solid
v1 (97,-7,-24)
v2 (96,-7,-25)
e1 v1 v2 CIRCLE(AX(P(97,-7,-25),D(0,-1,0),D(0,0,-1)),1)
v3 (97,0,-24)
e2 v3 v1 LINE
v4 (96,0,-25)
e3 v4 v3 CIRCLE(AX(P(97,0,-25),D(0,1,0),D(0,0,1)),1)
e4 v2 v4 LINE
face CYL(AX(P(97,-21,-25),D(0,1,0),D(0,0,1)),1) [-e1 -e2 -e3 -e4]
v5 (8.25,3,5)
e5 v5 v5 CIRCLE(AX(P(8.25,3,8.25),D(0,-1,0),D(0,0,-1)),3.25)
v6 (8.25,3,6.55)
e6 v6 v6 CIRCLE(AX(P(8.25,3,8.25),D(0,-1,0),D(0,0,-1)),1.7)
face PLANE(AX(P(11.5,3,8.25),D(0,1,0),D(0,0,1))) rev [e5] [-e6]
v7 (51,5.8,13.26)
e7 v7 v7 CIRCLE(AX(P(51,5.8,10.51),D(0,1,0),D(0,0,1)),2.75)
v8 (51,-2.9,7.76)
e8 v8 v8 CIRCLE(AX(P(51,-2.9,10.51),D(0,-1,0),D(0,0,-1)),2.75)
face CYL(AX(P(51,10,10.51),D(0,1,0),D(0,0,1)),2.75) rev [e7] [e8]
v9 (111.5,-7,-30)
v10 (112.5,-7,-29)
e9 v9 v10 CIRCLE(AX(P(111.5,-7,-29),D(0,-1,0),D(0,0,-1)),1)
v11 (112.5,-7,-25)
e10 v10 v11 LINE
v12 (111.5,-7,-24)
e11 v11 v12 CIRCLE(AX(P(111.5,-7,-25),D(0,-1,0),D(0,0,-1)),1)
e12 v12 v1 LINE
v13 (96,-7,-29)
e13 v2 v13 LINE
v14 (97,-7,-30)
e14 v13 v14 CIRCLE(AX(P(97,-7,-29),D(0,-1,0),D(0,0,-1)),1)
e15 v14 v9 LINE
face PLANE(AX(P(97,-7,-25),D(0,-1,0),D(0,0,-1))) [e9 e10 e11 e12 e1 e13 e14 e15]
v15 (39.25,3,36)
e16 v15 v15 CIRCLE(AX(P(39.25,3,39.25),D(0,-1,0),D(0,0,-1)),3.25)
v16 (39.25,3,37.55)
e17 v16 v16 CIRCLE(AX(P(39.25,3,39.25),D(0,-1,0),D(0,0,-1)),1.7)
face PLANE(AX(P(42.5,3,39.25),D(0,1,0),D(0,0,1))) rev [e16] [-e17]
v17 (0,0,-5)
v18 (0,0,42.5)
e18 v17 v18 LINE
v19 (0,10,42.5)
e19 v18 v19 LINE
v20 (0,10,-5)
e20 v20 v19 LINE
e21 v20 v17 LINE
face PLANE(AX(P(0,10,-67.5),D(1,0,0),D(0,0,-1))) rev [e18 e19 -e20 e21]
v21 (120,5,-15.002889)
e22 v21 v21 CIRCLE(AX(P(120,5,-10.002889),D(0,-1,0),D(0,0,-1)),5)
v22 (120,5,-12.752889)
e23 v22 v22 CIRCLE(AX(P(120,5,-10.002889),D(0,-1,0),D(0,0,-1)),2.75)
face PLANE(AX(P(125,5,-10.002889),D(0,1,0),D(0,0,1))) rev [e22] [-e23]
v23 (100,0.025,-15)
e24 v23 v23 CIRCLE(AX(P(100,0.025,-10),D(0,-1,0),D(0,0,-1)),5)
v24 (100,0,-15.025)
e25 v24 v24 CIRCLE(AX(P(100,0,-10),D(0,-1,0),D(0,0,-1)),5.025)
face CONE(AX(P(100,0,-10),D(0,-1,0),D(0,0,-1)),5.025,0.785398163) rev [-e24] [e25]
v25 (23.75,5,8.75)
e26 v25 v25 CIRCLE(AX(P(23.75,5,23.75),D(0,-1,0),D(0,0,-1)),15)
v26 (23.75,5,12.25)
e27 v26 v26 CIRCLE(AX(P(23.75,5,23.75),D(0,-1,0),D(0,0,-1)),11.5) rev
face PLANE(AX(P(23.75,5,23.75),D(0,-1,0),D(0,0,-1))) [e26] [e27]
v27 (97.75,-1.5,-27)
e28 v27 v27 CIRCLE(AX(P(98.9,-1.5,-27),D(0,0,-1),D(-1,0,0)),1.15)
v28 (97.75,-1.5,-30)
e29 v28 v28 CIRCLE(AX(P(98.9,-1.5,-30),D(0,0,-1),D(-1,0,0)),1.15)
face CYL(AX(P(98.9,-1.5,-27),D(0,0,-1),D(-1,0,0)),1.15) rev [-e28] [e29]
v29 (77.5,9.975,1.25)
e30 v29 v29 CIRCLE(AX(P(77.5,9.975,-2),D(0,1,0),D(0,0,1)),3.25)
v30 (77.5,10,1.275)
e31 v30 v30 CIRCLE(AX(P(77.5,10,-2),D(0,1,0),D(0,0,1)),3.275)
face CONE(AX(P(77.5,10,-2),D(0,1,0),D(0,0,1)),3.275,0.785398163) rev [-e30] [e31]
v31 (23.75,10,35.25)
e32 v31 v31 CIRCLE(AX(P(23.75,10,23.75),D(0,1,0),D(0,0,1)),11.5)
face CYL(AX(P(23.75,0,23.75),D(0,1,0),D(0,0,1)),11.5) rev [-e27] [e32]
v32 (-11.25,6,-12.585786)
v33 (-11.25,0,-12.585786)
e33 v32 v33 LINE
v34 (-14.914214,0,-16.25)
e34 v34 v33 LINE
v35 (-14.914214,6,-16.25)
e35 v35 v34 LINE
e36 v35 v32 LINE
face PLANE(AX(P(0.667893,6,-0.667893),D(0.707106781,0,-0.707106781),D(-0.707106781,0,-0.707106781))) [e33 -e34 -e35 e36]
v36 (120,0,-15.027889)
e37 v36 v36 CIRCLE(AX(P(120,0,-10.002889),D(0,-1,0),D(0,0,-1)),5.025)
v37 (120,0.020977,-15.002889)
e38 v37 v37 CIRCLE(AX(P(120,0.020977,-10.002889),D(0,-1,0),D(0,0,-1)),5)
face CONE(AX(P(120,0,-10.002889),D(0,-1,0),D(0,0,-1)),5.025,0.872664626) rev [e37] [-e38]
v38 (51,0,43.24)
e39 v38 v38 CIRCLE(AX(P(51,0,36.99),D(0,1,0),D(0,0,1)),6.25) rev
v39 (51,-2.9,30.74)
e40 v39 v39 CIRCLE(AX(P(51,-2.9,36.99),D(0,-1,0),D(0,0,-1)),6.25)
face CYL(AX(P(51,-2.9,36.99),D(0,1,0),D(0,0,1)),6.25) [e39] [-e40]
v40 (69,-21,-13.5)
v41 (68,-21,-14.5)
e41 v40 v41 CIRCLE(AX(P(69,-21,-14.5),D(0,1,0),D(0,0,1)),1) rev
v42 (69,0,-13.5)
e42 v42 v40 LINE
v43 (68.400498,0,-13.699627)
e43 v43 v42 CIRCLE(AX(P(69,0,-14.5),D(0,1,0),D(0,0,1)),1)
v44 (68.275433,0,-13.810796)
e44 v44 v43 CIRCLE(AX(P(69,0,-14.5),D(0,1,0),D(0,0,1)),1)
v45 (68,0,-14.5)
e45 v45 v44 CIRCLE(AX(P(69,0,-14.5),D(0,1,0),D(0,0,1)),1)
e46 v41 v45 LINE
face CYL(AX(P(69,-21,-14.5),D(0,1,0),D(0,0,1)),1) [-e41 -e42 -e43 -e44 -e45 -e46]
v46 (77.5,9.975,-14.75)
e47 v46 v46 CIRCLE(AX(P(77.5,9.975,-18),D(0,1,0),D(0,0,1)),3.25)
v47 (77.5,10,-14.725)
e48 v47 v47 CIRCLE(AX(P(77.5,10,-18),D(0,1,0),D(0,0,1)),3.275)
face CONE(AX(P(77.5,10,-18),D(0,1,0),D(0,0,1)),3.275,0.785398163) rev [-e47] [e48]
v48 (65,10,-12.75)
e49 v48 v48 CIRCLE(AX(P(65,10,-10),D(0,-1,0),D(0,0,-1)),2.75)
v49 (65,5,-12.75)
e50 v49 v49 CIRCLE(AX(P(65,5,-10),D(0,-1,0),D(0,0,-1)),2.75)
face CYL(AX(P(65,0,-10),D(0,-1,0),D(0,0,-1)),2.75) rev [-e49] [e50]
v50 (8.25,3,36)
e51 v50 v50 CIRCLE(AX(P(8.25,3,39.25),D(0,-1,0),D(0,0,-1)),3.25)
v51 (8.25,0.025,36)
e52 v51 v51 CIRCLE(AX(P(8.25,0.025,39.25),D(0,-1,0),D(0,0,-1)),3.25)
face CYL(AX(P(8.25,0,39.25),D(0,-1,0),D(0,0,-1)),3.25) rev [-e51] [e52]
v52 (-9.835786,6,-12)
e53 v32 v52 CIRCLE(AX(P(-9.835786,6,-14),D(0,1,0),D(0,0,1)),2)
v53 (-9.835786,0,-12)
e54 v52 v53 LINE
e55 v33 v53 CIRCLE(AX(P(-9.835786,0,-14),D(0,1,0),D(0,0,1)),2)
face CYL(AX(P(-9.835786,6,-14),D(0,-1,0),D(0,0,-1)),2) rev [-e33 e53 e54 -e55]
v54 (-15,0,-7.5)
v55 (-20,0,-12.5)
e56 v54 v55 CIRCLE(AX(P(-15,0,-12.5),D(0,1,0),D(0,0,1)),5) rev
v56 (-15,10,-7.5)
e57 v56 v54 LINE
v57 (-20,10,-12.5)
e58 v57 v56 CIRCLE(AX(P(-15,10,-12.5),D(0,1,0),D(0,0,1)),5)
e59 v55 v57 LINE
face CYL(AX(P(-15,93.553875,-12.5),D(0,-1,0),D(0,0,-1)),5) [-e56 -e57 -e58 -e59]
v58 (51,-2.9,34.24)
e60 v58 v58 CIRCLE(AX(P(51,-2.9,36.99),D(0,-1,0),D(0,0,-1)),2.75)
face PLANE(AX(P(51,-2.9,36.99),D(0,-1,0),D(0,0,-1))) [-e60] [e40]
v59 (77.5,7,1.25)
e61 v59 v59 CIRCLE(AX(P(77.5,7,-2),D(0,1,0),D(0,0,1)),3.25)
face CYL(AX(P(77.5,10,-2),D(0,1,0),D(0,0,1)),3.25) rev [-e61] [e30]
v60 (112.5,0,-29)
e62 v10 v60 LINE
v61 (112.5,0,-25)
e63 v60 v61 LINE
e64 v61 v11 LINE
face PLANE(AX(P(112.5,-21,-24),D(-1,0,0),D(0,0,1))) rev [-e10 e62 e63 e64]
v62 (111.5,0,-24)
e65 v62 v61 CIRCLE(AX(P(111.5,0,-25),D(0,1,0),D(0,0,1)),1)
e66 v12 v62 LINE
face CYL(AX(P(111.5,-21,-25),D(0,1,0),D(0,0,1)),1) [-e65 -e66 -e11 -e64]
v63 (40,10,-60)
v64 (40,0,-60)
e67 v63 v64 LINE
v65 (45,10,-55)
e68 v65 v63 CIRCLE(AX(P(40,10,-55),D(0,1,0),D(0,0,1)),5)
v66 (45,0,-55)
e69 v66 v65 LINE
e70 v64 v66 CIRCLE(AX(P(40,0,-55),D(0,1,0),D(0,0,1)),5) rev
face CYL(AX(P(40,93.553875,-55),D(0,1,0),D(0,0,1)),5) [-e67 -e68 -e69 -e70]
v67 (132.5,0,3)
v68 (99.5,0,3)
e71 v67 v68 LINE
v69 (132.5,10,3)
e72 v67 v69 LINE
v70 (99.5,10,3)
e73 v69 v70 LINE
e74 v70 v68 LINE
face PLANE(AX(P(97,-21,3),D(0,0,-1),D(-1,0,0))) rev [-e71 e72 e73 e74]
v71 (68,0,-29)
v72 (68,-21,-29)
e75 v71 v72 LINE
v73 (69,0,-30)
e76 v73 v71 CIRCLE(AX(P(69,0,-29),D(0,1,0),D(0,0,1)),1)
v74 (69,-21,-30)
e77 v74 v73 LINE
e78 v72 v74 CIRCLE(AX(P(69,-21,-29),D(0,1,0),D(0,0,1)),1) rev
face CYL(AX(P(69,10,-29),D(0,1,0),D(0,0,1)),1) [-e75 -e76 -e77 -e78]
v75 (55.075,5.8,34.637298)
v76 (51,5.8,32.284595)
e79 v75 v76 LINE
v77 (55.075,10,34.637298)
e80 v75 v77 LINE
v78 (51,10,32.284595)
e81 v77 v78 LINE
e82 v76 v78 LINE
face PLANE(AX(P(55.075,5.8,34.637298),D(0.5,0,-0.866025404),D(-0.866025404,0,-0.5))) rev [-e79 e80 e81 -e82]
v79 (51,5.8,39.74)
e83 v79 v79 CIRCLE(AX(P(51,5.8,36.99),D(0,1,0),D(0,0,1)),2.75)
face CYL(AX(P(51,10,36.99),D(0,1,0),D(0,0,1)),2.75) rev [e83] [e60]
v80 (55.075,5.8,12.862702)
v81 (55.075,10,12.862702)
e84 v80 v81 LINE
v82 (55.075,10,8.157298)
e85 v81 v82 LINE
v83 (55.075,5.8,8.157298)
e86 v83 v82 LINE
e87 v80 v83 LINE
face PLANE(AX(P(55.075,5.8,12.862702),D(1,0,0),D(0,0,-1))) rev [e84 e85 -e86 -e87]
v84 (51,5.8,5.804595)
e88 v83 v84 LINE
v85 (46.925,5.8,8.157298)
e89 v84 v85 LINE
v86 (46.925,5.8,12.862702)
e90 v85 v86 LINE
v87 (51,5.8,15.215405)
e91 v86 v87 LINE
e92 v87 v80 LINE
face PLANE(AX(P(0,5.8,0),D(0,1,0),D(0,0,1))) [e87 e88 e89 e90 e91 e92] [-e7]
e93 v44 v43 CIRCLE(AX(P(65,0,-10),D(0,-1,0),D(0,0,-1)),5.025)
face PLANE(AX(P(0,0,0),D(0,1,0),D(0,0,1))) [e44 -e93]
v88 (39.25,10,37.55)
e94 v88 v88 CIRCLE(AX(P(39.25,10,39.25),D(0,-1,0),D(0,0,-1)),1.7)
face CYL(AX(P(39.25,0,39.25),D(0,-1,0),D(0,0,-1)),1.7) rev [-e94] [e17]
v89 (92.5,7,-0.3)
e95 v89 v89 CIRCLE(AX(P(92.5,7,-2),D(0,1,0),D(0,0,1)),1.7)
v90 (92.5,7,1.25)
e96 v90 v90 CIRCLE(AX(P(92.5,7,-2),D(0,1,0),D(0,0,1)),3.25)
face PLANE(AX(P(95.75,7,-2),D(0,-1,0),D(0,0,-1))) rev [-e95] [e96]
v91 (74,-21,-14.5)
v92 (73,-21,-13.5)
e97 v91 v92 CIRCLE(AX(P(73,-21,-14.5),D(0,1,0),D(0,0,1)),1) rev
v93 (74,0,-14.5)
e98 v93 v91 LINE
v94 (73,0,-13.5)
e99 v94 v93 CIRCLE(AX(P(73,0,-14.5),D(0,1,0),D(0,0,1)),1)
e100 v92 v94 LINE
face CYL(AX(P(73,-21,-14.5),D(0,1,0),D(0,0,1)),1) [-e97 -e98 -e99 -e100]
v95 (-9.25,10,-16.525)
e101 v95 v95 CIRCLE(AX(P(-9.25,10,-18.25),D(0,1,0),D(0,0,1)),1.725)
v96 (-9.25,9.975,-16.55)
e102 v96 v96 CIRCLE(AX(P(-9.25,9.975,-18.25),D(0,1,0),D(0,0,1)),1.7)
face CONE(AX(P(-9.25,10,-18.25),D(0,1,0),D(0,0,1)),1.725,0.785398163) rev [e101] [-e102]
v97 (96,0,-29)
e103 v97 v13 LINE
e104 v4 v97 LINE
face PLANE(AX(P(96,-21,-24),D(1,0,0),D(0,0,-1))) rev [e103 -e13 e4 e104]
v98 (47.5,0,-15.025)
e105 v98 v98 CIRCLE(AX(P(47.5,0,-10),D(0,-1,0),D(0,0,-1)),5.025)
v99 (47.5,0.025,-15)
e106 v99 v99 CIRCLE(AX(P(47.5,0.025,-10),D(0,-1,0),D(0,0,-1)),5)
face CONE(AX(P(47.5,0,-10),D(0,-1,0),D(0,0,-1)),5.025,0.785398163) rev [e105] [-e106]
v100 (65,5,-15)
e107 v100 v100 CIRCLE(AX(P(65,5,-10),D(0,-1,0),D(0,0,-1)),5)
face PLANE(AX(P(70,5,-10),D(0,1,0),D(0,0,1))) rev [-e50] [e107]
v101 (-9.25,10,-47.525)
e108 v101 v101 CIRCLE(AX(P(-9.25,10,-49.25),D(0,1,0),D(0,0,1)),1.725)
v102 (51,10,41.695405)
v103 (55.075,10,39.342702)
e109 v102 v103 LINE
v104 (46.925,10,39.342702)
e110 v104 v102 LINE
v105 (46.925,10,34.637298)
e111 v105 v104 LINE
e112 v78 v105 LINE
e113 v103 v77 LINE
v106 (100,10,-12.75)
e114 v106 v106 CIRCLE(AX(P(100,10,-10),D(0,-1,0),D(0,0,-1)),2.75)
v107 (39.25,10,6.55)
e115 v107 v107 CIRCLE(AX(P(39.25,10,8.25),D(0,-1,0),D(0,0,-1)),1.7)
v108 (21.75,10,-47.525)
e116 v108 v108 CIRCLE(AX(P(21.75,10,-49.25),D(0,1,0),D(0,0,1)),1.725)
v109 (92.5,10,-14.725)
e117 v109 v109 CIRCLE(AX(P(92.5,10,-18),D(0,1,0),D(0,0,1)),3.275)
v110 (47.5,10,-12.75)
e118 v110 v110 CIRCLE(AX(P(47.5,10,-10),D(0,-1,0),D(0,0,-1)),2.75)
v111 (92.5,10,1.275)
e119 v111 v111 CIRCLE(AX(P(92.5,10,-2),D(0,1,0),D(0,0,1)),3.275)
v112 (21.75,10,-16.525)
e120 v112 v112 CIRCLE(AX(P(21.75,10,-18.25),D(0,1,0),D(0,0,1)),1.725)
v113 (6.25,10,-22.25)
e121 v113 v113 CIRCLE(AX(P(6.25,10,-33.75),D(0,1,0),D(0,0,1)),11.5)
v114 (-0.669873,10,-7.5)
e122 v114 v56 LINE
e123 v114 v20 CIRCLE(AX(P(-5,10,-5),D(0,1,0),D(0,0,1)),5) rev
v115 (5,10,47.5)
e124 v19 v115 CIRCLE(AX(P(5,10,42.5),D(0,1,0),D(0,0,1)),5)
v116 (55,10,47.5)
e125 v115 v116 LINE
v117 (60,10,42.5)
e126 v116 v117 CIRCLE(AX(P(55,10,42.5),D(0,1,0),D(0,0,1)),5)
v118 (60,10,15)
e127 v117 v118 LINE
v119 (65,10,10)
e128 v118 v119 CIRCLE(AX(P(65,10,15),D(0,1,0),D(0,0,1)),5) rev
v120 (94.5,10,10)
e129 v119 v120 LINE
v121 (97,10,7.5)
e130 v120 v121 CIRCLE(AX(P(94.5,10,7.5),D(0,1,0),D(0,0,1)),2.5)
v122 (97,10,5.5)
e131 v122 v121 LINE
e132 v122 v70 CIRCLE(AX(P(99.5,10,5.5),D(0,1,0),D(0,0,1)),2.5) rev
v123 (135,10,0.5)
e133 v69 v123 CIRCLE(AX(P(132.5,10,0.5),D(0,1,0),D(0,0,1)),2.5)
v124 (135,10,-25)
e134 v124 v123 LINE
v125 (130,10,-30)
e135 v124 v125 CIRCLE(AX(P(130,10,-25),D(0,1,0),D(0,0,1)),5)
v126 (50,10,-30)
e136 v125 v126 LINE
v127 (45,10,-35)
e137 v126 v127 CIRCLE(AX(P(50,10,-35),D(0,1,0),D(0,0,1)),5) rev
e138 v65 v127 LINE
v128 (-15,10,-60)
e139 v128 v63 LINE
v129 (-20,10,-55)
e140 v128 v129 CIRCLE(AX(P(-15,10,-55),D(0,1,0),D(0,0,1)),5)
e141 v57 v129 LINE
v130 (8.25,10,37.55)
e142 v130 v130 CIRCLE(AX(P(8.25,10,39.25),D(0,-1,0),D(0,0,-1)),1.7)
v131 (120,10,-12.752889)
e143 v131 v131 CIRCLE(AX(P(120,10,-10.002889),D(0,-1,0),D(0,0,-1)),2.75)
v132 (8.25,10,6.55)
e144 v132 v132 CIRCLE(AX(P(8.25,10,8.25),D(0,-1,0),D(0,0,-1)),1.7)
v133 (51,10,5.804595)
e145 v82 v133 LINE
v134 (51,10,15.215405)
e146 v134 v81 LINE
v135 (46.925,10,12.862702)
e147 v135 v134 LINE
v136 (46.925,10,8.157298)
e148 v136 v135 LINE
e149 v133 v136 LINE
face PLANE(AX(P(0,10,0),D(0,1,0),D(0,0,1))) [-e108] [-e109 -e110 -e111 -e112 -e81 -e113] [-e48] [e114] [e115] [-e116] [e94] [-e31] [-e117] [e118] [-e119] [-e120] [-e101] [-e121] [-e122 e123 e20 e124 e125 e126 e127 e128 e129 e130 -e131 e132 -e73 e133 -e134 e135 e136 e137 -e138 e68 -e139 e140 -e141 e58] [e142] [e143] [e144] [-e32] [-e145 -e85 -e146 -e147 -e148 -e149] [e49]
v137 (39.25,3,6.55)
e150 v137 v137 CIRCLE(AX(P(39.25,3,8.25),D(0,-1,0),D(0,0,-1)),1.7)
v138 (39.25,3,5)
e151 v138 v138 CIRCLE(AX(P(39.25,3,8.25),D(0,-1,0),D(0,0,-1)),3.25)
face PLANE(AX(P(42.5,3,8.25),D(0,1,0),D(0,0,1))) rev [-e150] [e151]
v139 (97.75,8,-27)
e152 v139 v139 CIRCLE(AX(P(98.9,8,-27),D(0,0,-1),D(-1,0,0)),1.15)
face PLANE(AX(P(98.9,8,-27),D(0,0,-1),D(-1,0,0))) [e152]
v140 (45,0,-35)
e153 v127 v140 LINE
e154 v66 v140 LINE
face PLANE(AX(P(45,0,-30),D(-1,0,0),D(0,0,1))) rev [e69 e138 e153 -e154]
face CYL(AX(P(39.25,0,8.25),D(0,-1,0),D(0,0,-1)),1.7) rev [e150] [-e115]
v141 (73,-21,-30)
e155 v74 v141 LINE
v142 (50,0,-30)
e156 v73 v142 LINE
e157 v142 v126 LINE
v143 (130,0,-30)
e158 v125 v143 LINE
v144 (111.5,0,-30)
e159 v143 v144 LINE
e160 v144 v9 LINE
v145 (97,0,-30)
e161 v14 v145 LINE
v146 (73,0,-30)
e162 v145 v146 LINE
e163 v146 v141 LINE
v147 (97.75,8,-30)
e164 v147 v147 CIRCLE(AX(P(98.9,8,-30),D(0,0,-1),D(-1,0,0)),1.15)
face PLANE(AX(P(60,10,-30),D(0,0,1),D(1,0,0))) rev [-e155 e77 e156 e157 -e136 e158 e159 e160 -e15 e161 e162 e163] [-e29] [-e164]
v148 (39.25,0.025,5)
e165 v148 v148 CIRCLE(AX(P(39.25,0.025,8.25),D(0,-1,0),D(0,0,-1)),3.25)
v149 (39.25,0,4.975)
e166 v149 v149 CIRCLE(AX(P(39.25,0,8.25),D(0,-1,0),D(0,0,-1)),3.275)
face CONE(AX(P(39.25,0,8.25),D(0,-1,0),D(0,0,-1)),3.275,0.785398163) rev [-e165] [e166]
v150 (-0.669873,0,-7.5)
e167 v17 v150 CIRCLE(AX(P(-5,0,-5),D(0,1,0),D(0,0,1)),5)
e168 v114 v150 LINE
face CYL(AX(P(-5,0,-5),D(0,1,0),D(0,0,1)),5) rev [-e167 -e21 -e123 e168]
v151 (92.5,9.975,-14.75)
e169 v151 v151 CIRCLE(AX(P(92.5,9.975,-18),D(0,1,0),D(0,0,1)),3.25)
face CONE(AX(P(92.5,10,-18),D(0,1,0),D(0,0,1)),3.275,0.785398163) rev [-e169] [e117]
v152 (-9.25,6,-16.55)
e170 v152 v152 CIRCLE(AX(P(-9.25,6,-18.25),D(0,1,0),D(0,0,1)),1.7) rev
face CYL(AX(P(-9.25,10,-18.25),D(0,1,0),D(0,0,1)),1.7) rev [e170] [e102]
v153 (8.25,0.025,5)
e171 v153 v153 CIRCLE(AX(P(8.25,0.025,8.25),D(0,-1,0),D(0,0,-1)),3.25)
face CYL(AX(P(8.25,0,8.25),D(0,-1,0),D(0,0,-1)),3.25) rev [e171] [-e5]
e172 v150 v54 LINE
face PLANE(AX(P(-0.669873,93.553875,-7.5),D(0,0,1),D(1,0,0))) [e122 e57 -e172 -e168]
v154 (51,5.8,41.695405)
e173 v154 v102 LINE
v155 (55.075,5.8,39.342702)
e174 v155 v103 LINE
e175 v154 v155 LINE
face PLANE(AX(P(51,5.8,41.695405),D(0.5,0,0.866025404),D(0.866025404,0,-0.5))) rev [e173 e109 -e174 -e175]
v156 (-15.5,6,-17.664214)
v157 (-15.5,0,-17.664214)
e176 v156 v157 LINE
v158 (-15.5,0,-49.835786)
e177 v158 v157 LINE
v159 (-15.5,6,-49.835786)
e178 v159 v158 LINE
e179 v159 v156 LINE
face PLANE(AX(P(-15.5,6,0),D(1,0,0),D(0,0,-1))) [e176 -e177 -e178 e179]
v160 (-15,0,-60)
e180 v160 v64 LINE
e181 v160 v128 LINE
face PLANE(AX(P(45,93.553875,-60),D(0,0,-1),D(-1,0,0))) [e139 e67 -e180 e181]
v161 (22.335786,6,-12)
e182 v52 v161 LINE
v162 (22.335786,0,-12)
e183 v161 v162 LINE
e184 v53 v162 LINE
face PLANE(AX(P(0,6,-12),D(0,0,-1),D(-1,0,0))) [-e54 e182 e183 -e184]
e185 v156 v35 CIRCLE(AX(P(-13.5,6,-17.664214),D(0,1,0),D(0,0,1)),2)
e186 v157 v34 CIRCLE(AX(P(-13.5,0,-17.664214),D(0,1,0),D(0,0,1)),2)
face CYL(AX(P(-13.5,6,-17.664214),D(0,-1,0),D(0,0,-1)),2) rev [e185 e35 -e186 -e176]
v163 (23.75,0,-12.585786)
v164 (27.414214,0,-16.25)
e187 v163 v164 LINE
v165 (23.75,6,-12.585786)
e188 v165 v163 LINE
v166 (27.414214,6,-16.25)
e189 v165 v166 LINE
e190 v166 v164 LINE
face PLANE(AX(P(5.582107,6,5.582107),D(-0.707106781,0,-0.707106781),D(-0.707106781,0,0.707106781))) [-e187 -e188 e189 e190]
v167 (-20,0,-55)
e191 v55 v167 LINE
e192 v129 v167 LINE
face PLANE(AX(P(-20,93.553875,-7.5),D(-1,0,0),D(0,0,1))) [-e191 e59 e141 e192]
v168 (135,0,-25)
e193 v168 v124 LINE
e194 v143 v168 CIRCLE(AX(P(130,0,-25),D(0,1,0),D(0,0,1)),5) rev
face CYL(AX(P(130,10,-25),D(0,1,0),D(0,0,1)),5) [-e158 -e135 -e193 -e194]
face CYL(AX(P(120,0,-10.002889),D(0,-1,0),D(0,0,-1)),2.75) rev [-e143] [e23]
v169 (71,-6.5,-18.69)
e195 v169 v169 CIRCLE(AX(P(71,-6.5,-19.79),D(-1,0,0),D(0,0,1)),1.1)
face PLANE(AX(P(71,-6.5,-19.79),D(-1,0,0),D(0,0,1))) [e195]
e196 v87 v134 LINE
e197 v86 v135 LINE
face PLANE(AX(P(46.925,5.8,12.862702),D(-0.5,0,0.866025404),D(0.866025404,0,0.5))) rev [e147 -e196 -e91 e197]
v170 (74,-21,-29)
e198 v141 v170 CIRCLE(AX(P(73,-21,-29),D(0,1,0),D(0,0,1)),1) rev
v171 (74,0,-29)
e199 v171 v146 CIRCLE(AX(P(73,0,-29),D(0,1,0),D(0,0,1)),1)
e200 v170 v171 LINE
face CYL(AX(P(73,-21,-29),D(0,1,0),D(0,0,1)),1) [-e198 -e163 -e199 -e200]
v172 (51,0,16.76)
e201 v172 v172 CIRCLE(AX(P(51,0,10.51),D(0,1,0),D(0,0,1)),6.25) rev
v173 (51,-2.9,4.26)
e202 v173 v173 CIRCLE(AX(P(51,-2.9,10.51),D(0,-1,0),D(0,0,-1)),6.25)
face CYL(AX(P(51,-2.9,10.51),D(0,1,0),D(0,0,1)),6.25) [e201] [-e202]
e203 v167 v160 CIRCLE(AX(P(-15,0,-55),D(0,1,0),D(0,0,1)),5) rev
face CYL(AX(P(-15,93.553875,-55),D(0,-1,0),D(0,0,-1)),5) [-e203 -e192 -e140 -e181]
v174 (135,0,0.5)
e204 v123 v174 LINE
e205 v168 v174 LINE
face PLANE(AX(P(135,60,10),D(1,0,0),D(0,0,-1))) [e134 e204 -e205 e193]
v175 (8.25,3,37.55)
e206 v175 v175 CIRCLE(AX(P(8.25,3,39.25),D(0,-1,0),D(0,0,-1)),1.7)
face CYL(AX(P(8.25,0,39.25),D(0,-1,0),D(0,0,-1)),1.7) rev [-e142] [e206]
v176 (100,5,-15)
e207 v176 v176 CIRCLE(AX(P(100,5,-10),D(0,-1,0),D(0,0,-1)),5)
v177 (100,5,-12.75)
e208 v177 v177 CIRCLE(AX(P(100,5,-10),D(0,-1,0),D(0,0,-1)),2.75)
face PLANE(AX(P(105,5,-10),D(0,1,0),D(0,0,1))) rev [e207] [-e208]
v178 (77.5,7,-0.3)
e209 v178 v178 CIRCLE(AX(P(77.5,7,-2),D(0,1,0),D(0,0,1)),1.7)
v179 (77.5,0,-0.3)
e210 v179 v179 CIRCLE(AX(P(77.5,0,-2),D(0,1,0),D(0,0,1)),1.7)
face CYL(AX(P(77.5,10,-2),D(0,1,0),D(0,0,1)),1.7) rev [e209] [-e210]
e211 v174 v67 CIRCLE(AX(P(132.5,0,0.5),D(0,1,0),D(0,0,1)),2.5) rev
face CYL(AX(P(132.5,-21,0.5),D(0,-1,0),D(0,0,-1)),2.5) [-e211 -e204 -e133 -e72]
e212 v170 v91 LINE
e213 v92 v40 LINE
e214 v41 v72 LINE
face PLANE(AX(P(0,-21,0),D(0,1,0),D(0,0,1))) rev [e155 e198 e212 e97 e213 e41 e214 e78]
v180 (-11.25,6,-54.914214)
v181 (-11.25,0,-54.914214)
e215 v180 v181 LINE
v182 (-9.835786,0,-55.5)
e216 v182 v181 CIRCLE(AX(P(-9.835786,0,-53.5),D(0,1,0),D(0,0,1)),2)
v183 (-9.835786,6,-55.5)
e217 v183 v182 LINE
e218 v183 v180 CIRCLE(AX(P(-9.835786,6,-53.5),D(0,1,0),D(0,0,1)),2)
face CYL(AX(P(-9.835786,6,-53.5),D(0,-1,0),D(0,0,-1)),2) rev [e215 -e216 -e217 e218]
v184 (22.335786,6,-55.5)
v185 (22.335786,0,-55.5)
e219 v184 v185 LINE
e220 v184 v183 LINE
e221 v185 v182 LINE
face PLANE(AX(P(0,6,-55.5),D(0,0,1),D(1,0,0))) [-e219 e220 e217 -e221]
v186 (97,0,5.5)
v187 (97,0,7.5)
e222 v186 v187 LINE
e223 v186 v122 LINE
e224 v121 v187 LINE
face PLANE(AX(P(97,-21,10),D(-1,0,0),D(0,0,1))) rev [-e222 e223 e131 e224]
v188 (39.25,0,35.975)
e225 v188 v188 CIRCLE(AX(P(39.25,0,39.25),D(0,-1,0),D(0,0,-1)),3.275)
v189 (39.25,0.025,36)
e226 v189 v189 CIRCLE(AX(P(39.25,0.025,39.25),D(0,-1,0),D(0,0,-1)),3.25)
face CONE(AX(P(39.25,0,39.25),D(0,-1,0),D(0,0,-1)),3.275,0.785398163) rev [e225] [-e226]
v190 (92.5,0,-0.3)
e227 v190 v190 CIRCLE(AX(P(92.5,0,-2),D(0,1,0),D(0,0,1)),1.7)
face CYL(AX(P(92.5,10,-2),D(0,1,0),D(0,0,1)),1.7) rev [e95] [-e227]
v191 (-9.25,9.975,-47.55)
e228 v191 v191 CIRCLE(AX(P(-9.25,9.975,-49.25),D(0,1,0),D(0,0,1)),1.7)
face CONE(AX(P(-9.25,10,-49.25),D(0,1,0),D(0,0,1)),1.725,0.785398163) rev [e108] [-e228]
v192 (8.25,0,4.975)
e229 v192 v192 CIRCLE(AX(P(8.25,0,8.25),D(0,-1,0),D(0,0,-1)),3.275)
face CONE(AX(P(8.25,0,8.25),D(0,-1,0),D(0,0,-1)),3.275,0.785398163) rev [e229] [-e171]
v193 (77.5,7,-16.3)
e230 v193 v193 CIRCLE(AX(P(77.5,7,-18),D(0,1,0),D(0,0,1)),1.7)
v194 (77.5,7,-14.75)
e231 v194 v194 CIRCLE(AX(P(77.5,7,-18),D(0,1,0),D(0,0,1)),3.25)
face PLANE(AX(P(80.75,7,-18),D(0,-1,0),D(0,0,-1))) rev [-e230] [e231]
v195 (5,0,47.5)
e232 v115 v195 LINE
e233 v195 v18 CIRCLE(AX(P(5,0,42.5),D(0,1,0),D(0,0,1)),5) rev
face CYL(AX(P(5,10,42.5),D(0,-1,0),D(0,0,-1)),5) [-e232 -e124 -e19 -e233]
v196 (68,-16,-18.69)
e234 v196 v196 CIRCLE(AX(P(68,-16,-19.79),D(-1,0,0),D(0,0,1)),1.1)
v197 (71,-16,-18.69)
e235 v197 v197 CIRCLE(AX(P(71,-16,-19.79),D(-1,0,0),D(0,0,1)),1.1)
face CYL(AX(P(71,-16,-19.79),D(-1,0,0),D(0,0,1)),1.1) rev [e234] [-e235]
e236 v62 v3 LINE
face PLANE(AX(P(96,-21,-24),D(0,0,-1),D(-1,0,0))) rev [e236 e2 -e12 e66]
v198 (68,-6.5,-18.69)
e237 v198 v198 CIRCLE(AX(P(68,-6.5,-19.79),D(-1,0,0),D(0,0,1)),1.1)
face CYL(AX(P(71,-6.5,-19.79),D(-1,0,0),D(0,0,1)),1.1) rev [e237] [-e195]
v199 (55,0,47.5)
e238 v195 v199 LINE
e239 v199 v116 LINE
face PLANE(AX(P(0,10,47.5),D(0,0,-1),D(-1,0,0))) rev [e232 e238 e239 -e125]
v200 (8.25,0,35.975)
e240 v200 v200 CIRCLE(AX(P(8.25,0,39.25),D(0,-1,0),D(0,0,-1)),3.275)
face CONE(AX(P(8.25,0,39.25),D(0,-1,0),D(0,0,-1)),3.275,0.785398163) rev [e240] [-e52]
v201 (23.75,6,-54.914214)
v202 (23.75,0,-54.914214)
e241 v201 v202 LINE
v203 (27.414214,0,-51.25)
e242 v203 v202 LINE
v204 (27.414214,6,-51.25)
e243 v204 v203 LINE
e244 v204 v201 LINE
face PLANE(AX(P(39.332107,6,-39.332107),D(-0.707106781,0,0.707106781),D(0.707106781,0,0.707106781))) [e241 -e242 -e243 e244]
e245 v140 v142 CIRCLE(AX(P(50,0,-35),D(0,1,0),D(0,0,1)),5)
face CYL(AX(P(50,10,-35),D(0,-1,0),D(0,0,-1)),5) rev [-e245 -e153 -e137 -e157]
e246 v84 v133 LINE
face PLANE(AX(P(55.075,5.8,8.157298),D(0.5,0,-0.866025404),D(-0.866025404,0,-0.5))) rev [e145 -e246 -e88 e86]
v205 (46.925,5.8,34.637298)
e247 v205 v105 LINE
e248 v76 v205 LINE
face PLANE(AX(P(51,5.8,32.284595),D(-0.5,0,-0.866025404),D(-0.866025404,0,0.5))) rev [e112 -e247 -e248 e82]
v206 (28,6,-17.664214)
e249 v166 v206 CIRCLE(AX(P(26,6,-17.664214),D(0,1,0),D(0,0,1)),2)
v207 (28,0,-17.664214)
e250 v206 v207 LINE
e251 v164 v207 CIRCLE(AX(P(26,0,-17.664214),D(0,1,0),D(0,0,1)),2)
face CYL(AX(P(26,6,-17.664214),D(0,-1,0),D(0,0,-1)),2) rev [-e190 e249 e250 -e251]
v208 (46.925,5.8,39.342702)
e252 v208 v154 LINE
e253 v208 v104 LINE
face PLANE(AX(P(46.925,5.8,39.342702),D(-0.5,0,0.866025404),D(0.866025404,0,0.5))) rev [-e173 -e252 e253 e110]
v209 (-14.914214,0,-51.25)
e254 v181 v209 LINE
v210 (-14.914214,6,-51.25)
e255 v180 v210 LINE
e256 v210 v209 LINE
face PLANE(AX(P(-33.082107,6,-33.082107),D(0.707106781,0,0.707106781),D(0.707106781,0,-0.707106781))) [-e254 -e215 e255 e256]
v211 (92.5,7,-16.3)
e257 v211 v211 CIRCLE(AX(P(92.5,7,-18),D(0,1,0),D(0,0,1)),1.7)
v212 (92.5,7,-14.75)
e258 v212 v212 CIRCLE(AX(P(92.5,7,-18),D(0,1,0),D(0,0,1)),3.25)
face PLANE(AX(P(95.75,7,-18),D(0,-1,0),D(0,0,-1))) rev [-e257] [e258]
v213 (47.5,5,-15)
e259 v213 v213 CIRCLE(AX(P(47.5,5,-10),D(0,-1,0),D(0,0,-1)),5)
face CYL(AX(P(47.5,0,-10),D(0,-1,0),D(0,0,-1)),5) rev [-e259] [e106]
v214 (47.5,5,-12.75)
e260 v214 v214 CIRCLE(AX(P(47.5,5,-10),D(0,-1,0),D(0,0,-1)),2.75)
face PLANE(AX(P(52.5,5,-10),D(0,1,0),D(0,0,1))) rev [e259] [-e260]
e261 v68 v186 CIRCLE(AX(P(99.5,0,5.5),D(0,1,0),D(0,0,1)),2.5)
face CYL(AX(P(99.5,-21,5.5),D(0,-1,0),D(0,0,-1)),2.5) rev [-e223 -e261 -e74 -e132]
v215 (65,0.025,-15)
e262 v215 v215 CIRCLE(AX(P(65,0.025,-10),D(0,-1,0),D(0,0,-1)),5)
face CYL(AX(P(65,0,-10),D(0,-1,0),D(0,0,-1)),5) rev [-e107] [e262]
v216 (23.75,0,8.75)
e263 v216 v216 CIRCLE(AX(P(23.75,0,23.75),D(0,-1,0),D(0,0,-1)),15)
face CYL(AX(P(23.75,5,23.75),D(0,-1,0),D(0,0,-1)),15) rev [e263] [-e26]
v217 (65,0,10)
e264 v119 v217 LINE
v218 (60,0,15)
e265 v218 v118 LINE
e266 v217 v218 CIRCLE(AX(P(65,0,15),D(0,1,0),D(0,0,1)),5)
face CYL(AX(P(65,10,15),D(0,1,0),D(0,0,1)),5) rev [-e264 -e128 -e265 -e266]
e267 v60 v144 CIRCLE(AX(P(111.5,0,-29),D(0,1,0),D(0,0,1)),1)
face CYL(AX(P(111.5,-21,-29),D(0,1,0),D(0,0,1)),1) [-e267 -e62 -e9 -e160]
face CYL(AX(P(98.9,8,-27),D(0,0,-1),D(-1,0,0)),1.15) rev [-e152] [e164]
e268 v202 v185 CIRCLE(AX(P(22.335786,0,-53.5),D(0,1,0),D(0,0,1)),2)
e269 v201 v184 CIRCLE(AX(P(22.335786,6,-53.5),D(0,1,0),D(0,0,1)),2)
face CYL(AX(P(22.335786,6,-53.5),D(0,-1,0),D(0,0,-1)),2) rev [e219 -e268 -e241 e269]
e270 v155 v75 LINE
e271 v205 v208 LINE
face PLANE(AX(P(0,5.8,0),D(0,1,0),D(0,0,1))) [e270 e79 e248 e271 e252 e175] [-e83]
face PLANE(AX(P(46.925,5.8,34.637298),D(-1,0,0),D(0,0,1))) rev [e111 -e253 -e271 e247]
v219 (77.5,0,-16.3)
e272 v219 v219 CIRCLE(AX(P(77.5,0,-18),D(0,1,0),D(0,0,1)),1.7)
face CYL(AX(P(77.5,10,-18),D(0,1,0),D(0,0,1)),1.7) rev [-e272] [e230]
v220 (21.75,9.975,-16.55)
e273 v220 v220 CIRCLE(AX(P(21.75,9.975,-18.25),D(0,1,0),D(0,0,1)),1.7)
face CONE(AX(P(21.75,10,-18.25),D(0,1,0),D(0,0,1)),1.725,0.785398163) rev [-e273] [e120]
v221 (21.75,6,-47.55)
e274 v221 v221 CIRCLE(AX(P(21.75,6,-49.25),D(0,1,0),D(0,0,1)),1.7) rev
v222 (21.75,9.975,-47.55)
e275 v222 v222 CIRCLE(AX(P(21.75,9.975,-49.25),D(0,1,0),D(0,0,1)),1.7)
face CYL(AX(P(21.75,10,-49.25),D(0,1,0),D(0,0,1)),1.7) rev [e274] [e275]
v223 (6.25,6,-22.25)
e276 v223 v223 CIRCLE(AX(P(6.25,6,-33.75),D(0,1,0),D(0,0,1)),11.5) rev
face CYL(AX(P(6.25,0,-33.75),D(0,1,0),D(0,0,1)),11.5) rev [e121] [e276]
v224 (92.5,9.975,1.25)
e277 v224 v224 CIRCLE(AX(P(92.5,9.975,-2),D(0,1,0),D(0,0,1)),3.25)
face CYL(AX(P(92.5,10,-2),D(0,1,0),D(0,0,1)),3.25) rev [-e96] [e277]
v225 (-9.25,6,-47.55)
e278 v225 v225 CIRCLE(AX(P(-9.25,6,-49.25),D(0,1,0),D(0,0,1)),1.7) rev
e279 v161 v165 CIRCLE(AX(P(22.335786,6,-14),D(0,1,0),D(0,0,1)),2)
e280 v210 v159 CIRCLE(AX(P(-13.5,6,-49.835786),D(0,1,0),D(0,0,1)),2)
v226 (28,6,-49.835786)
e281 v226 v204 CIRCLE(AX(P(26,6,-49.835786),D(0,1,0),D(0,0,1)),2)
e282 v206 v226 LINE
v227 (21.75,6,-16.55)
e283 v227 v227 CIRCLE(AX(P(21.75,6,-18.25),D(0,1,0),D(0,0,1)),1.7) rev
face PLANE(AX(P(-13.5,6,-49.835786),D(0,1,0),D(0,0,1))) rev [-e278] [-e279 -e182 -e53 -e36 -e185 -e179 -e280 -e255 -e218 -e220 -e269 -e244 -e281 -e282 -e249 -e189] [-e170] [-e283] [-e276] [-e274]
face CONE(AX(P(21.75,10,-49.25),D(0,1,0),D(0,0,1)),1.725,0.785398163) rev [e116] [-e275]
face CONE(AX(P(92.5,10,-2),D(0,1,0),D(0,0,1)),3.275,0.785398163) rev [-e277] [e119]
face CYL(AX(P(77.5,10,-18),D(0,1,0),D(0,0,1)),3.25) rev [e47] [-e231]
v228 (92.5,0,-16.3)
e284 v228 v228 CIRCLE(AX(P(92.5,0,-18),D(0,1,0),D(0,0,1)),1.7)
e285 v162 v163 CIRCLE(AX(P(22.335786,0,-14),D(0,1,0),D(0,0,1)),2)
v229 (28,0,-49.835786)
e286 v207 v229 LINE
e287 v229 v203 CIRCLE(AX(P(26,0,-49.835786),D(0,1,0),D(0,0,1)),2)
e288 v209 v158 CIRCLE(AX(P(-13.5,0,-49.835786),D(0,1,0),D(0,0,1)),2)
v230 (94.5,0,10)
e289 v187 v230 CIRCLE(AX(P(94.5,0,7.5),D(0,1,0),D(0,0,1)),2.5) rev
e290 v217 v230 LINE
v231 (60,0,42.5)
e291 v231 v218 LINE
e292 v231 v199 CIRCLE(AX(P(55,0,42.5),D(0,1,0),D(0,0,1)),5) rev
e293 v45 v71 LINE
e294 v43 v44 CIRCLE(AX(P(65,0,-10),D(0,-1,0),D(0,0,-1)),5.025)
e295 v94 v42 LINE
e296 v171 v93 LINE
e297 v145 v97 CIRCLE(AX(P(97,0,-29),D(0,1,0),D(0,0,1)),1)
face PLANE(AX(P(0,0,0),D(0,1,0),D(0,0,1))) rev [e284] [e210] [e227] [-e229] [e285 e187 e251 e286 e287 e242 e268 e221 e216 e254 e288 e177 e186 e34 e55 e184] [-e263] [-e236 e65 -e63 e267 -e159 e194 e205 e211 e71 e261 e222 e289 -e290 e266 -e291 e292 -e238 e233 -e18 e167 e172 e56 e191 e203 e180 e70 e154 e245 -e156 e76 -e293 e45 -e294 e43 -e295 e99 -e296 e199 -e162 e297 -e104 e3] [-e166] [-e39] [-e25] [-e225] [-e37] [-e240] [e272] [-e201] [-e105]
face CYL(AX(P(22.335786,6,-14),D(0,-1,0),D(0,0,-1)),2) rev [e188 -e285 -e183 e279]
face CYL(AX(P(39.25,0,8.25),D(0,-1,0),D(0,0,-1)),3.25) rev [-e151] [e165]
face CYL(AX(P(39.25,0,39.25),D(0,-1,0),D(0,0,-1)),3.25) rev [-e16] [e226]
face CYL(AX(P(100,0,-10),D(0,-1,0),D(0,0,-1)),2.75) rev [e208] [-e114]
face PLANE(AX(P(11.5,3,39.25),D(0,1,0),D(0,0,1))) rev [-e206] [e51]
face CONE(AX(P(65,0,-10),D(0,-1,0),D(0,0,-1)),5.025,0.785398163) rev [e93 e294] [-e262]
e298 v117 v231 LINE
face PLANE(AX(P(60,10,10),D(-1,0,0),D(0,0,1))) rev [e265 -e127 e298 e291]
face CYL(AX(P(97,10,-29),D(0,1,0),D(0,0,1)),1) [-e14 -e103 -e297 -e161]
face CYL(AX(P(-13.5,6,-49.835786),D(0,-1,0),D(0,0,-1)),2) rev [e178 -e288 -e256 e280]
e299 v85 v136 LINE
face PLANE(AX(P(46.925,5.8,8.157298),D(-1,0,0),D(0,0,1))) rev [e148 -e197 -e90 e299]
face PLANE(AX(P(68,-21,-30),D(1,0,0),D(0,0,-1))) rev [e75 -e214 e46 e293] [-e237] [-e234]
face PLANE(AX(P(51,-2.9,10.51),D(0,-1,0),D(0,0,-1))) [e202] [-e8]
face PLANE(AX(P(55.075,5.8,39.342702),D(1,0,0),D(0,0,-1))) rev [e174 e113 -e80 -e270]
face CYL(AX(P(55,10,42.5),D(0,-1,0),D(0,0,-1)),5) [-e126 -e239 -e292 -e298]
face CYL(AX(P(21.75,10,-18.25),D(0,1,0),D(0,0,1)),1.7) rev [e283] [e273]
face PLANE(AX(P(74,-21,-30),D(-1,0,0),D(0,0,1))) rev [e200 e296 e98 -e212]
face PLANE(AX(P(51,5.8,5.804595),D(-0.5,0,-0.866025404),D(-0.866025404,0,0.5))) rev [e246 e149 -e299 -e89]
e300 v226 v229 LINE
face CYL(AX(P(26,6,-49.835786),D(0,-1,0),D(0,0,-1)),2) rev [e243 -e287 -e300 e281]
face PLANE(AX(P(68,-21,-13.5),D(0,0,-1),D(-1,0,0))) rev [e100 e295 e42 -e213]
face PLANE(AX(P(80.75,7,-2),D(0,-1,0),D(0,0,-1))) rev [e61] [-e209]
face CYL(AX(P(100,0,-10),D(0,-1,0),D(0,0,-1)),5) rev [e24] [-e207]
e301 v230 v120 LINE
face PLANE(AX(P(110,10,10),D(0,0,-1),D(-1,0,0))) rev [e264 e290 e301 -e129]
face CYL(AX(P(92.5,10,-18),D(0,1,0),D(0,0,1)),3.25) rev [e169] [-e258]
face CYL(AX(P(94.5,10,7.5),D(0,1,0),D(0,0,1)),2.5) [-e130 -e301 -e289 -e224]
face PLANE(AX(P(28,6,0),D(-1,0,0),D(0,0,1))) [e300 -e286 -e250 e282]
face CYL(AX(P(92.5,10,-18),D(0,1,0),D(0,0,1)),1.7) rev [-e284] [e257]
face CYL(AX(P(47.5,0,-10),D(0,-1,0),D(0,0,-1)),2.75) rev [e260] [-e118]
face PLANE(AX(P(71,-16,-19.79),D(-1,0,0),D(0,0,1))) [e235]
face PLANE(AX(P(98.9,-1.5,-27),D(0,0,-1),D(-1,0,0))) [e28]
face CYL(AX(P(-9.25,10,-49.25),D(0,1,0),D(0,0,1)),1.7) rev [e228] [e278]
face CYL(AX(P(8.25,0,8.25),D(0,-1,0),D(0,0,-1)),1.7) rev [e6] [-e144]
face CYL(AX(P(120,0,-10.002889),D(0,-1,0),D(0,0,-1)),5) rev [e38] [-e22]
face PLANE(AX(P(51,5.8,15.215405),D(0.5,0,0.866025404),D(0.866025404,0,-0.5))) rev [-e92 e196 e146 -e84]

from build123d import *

# Parameters (mm, degrees)
BOSS_EXTRUDE1_DEPTH            = 10
FILLET1_R                      = 5
SKETCH3_R                      = 11.5
CUT_EXTRUDE1_DEPTH             = 10
CBORE_FOR_M3_SHCS1_AT_2_COUNT  = 2
CBORE_FOR_M3_SHCS1_AT_2_PITCH  = 43.840620434
CBORE_FOR_M3_SHCS1_AT_3_COUNT  = 2
CBORE_FOR_M3_SHCS1_AT_3_PITCH  = 31
CBORE_FOR_M3_SHCS1_AT_4_COUNT  = 2
CBORE_FOR_M3_SHCS1_AT_4_PITCH  = 31
CBORE_FOR_M3_SHCS2_AT_2_COUNT  = 2
CBORE_FOR_M3_SHCS2_AT_2_PITCH  = 15
CBORE_FOR_M3_SHCS2_AT_3_COUNT  = 2
CBORE_FOR_M3_SHCS2_AT_3_PITCH  = 21.931712199
CBORE_FOR_M3_SHCS2_AT_4_COUNT  = 2
CBORE_FOR_M3_SHCS2_AT_4_PITCH  = 16
CBORE_FOR_M5_SHCS1_AT_2_COUNT  = 2
CBORE_FOR_M5_SHCS1_AT_2_PITCH  = 35
CBORE_FOR_M5_SHCS1_AT_3_COUNT  = 2
CBORE_FOR_M5_SHCS1_AT_3_PITCH  = 52.5
BOSS_EXTRUDE2_DEPTH            = 10
CUT_EXTRUDE2_DEPTH             = 10
FILLET2_R                      = 5
SKETCH16_R                     = 11.5
CUT_EXTRUDE3_DEPTH             = 125.524094054
M3_CLEARANCE_HOLE1_D           = 3.4
M3_CLEARANCE_HOLE1_CSINK_D     = 3.45
M3_CLEARANCE_HOLE1_CSINK_ANGLE = 90
CUT_EXTRUDE4_DEPTH             = 4.2
M5_CLEARANCE_HOLE1_D           = 5.5
M5_CLEARANCE_HOLE1_CSINK_D     = 5.55
M5_CLEARANCE_HOLE1_CSINK_ANGLE = 90
SKETCH25_R                     = 15
CUT_EXTRUDE6_DEPTH             = 5
BOSS_EXTRUDE3_START            = 2.9
SKETCH26_R                     = 6.25
SKETCH26_R_2                   = 2.75
BOSS_EXTRUDE3_DEPTH            = 2.9
CUT_EXTRUDE7_DEPTH             = 10
FILLET3_R                      = 5
CUT_EXTRUDE9_START             = -10
CUT_EXTRUDE9_DEPTH             = 6
BOSS_EXTRUDE5_DEPTH            = 10
FILLET4_R                      = 5
BOSS_EXTRUDE6_START            = -10
BOSS_EXTRUDE6_DEPTH            = 10
FILLET5_R                      = 5
SKETCH38_W                     = 6
SKETCH38_H                     = 16.5
SKETCH38_W_2                   = 16.5
SKETCH38_H_2                   = 6
BOSS_EXTRUDE7_DEPTH            = 21
FILLET6_R                      = 1
SKETCH39_R                     = 1.1
CUT_EXTRUDE10_DEPTH            = 3
CUT_EXTRUDE11_START            = -14
CUT_EXTRUDE11_DEPTH            = 14
SKETCH43_R                     = 1.15
CUT_EXTRUDE12_DEPTH            = 3
CUT_EXTRUDE13_DEPTH            = 151.950322954
FILLET7_R                      = 2.5


with BuildPart() as part:
    # Sketch1 → Boss-Extrude1 (new body)
    with BuildSketch(Plane(origin=(0, 0, 0), x_dir=(1, 0, 0), z_dir=(0, 1, 0))):
        Polygon((0, 67.5), (0, -47.5), (60, -47.5), (60, -10), (110, -10), (110, 30), (60, 30), (60, 67.5), align=None)
    extrude(amount=BOSS_EXTRUDE1_DEPTH)

    # Fillet1
    fillet1_edges = [part.edges().sort_by_distance(p)[0] for p in [
        (60, 5, -30),
        (110, 5, -30),
        (110, 5, 10),
        (60, 5, 47.5),
        (0, 5, 47.5),
        (0, 5, -67.5),
        (60, 5, -67.5),
    ]]
    fillet(fillet1_edges, radius=FILLET1_R)

    # Sketch3 → Cut-Extrude1 (cut)
    with BuildSketch(Plane(origin=(0, 10, 0), x_dir=(1, 0, 0), z_dir=(0, 1, 0))):
        with Locations(Location((23.75, -23.75, 0), (0, 0, 270))):
            Circle(SKETCH3_R)
    extrude(amount=-CUT_EXTRUDE1_DEPTH, mode=Mode.SUBTRACT)

    # Sketch6 → CBORE for M3 SHCS1 (revolve, cut)
    with BuildSketch(Plane(origin=(39.25, 0, 8.25), x_dir=(0, 0, -1), z_dir=(1, 0, 0))):
        Polygon((0, 0), (0, 10), (1.7, 10), (1.7, 3), (3.25, 3), (3.25, 0.025), (3.275, 0), align=None)
    cbore_for_m3_shcs1 = revolve(axis=Axis((39.25, -6.35, 8.25), (0, 1, 0)), mode=Mode.SUBTRACT)

    # CBORE for M3 SHCS1 at 2: CBORE for M3 SHCS1 ×2
    with Locations(*[Vector(-0.7071067811865478, 0, 0.7071067811865474) * (i * CBORE_FOR_M3_SHCS1_AT_2_PITCH) for i in range(1, CBORE_FOR_M3_SHCS1_AT_2_COUNT)]):
        add(cbore_for_m3_shcs1, mode=Mode.SUBTRACT)

    # CBORE for M3 SHCS1 at 3: CBORE for M3 SHCS1 ×2
    with Locations(*[(-i * CBORE_FOR_M3_SHCS1_AT_3_PITCH, 0, 0) for i in range(1, CBORE_FOR_M3_SHCS1_AT_3_COUNT)]):
        add(cbore_for_m3_shcs1, mode=Mode.SUBTRACT)

    # CBORE for M3 SHCS1 at 4: CBORE for M3 SHCS1 ×2
    with Locations(*[(0, 0, i * CBORE_FOR_M3_SHCS1_AT_4_PITCH) for i in range(1, CBORE_FOR_M3_SHCS1_AT_4_COUNT)]):
        add(cbore_for_m3_shcs1, mode=Mode.SUBTRACT)

    # Sketch9 → CBORE for M3 SHCS2 (revolve, cut)
    with BuildSketch(Plane(origin=(77.5, 10, -18), x_dir=(0, 0, 1), z_dir=(1, 0, 0))):
        Polygon((0, 0), (0, 10), (1.7, 10), (1.7, 3), (3.25, 3), (3.25, 0.025), (3.275, 0), align=None)
    cbore_for_m3_shcs2 = revolve(axis=Axis((77.5, 16.35, -18), (0, -1, 0)), mode=Mode.SUBTRACT)

    # CBORE for M3 SHCS2 at 2: CBORE for M3 SHCS2 ×2
    with Locations(*[(i * CBORE_FOR_M3_SHCS2_AT_2_PITCH, 0, 0) for i in range(1, CBORE_FOR_M3_SHCS2_AT_2_COUNT)]):
        add(cbore_for_m3_shcs2, mode=Mode.SUBTRACT)

    # CBORE for M3 SHCS2 at 3: CBORE for M3 SHCS2 ×2
    with Locations(*[Vector(0.6839411288813299, 0, 0.729537204140085) * (i * CBORE_FOR_M3_SHCS2_AT_3_PITCH) for i in range(1, CBORE_FOR_M3_SHCS2_AT_3_COUNT)]):
        add(cbore_for_m3_shcs2, mode=Mode.SUBTRACT)

    # CBORE for M3 SHCS2 at 4: CBORE for M3 SHCS2 ×2
    with Locations(*[(0, 0, i * CBORE_FOR_M3_SHCS2_AT_4_PITCH) for i in range(1, CBORE_FOR_M3_SHCS2_AT_4_COUNT)]):
        add(cbore_for_m3_shcs2, mode=Mode.SUBTRACT)

    # Sketch12 → CBORE for M5 SHCS1 (revolve, cut)
    with BuildSketch(Plane(origin=(100, 0, -10), x_dir=(0, 0, -1), z_dir=(1, 0, 0))):
        Polygon((0, 0), (0, 10), (2.75, 10), (2.75, 5), (5, 5), (5, 0.025), (5.025, 0), align=None)
    cbore_for_m5_shcs1 = revolve(axis=Axis((100, -6.35, -10), (0, 1, 0)), mode=Mode.SUBTRACT)

    # CBORE for M5 SHCS1 at 2: CBORE for M5 SHCS1 ×2
    with Locations(*[(-i * CBORE_FOR_M5_SHCS1_AT_2_PITCH, 0, 0) for i in range(1, CBORE_FOR_M5_SHCS1_AT_2_COUNT)]):
        add(cbore_for_m5_shcs1, mode=Mode.SUBTRACT)

    # CBORE for M5 SHCS1 at 3: CBORE for M5 SHCS1 ×2
    with Locations(*[(-i * CBORE_FOR_M5_SHCS1_AT_3_PITCH, 0, 0) for i in range(1, CBORE_FOR_M5_SHCS1_AT_3_COUNT)]):
        add(cbore_for_m5_shcs1, mode=Mode.SUBTRACT)

    # Sketch14 → Boss-Extrude2 (add)
    with BuildSketch(Plane(origin=(0, 10, 0), x_dir=(1, 0, 0), z_dir=(0, 1, 0))):
        with BuildLine():
            Line((0, 10), (-17.5, 10))
            Line((-17.5, 10), (-17.5, 67.5))
            Line((-17.5, 67.5), (5, 67.5))
            ThreePointArc((5, 67.5), (1.464466094, 66.035533906), (0, 62.5))
            Line((0, 62.5), (0, 10))
        make_face()
    extrude(amount=-BOSS_EXTRUDE2_DEPTH)

    # Sketch15 → Cut-Extrude2 (cut)
    with BuildSketch(Plane(origin=(0, 10, 0), x_dir=(1, 0, 0), z_dir=(0, 1, 0))):
        with BuildLine():
            Line((-17.5, 67.5), (55, 67.5))
            ThreePointArc((55, 67.5), (58.535533906, 66.035533906), (60, 62.5))
            Line((60, 62.5), (60, 57.5))
            Line((60, 57.5), (-17.5, 57.5))
            Line((-17.5, 57.5), (-17.5, 67.5))
        make_face()
    extrude(amount=-CUT_EXTRUDE2_DEPTH, mode=Mode.SUBTRACT)

    # Fillet2
    fillet2_edges = [part.edges().sort_by_distance(p)[0] for p in [
        (0, 5, -10),
        (-17.5, 5, -10),
        (-17.5, 5, -57.5),
        (60, 5, -57.5),
    ]]
    fillet(fillet2_edges, radius=FILLET2_R)

    # Sketch16 → Cut-Extrude3 (cut, through all)
    with BuildSketch(Plane(origin=(0, 10, 0), x_dir=(1, 0, 0), z_dir=(0, 1, 0))):
        with Locations(Location((6.25, 33.75, 0), (0, 0, 270))):
            Circle(SKETCH16_R)
    extrude(amount=-CUT_EXTRUDE3_DEPTH, mode=Mode.SUBTRACT)

    # M3 Clearance Hole1 (through all)
    with Locations(Plane(origin=(0, 10, 0), x_dir=(1, 0, 0), z_dir=(0, 1, 0))):
        with Locations((-9.25, 49.25), (21.75, 49.25), (21.75, 18.25), (-9.25, 18.25)):
            CounterSinkHole(M3_CLEARANCE_HOLE1_D / 2, M3_CLEARANCE_HOLE1_CSINK_D / 2, counter_sink_angle=M3_CLEARANCE_HOLE1_CSINK_ANGLE)

    # Sketch20 → Cut-Extrude4 (cut)
    with BuildSketch(Plane(origin=(0, 10, 0), x_dir=(1, 0, 0), z_dir=(0, 1, 0))):
        Polygon((55.075, -8.157297653), (51, -5.804595306), (46.925, -8.157297653), (46.925, -12.862702347), (51, -15.215404694), (55.075, -12.862702347), align=None)
        Polygon((51, -32.284595306), (46.925, -34.637297653), (46.925, -39.342702347), (51, -41.695404694), (55.075, -39.342702347), (55.075, -34.637297653), align=None)
    extrude(amount=-CUT_EXTRUDE4_DEPTH, mode=Mode.SUBTRACT)

    # M5 Clearance Hole1 (through all)
    with Locations(Plane(origin=(0, 10, 0), x_dir=(1, 0, 0), z_dir=(0, 1, 0))):
        with Locations((51, -10.51), (51, -36.99)):
            CounterSinkHole(M5_CLEARANCE_HOLE1_D / 2, M5_CLEARANCE_HOLE1_CSINK_D / 2, counter_sink_angle=M5_CLEARANCE_HOLE1_CSINK_ANGLE)

    # Sketch25 → Cut-Extrude6 (cut)
    with BuildSketch(Plane.XZ):
        with Locations(Location((23.75, 23.75, 0), (0, 0, 270))):
            Circle(SKETCH25_R)
    extrude(amount=-CUT_EXTRUDE6_DEPTH, mode=Mode.SUBTRACT)

    # Sketch26 → Boss-Extrude3 (add)
    # profile 1 of 2: a face of its own
    with BuildSketch(Plane.XZ.offset(BOSS_EXTRUDE3_START)):
        with Locations(Location((51, 36.99, 0), (0, 0, 90))):
            Circle(SKETCH26_R)
        with Locations(Location((51, 36.99, 0), (0, 0, 90))):
            Circle(SKETCH26_R_2, mode=Mode.SUBTRACT)
    # profile 2 of 2: a face of its own
    with BuildSketch(Plane.XZ.offset(BOSS_EXTRUDE3_START)):
        with Locations(Location((51, 10.51, 0), (0, 0, 90))):
            Circle(SKETCH26_R)
        with Locations(Location((51, 10.51, 0), (0, 0, 90))):
            Circle(SKETCH26_R_2, mode=Mode.SUBTRACT)
    extrude(amount=-BOSS_EXTRUDE3_DEPTH)

    # Sketch27 → Cut-Extrude7 (cut)
    with BuildSketch(Plane(origin=(0, 10, 0), x_dir=(1, 0, 0), z_dir=(0, 1, 0))):
        with BuildLine():
            Line((65, 30), (45, 30))
            Line((45, 30), (45, 57.5))
            Line((45, 57.5), (55, 57.5))
            ThreePointArc((55, 57.5), (58.535533906, 56.035533906), (60, 52.5))
            Line((60, 52.5), (60, 35))
            ThreePointArc((60, 35), (61.464466094, 31.464466094), (65, 30))
        make_face()
    extrude(amount=-CUT_EXTRUDE7_DEPTH, mode=Mode.SUBTRACT)

    # Fillet3
    fillet3_edges = [part.edges().sort_by_distance(p)[0] for p in [
        (60, 5, 10),
        (45, 5, -30),
        (45, 5, -57.5),
    ]]
    fillet(fillet3_edges, radius=FILLET3_R)

    # Sketch31 → Cut-Extrude9 (cut)
    with BuildSketch(Plane(origin=(0, 10, 0), x_dir=(1, 0, 0), z_dir=(0, 1, 0)).offset(CUT_EXTRUDE9_START)):
        with BuildLine():
            Line((-15.5, 49.835786438), (-15.5, 17.664213562))
            ThreePointArc((-15.5, 17.664213562), (-15.347759065, 16.898846698), (-14.914213562, 16.25))
            Line((-14.914213562, 16.25), (-11.25, 12.585786438))
            ThreePointArc((-11.25, 12.585786438), (-10.601153302, 12.152240935), (-9.835786438, 12))
            Line((-9.835786438, 12), (22.335786438, 12))
            ThreePointArc((22.335786438, 12), (23.101153302, 12.152240935), (23.75, 12.585786438))
            Line((23.75, 12.585786438), (27.414213562, 16.25))
            ThreePointArc((27.414213562, 16.25), (27.847759065, 16.898846698), (28, 17.664213562))
            Line((28, 17.664213562), (28, 49.835786438))
            ThreePointArc((28, 49.835786438), (27.847759065, 50.601153302), (27.414213562, 51.25))
            Line((27.414213562, 51.25), (23.75, 54.914213562))
            ThreePointArc((23.75, 54.914213562), (23.101153302, 55.347759065), (22.335786438, 55.5))
            Line((22.335786438, 55.5), (-9.835786438, 55.5))
            ThreePointArc((-9.835786438, 55.5), (-10.601153302, 55.347759065), (-11.25, 54.914213562))
            Line((-11.25, 54.914213562), (-14.914213562, 51.25))
            ThreePointArc((-14.914213562, 51.25), (-15.347759065, 50.601153302), (-15.5, 49.835786438))
        make_face()
    extrude(amount=CUT_EXTRUDE9_DEPTH, mode=Mode.SUBTRACT)

    # Sketch32 → Boss-Extrude5 (add)
    with BuildSketch(Plane.XZ):
        with BuildLine():
            Line((-20, -7.5), (-20, -60))
            Line((-20, -60), (45, -60))
            Line((45, -60), (45, -52.5))
            ThreePointArc((45, -52.5), (43.535533906, -56.035533906), (40, -57.5))
            Line((40, -57.5), (-12.5, -57.5))
            ThreePointArc((-12.5, -57.5), (-16.035533906, -56.035533906), (-17.5, -52.5))
            Line((-17.5, -52.5), (-17.5, -15))
            ThreePointArc((-17.5, -15), (-16.035533906, -11.464466094), (-12.5, -10))
            Line((-12.5, -10), (-5, -10))
            ThreePointArc((-5, -10), (-2.5, -9.330127019), (-0.669872981, -7.5))
            Line((-0.669872981, -7.5), (-20, -7.5))
        make_face()
    extrude(amount=-BOSS_EXTRUDE5_DEPTH)

    # Fillet4
    fillet4_edges = [part.edges().sort_by_distance(p)[0] for p in [
        (-20, 5, -7.5),
        (-20, 5, -60),
        (45, 5, -60),
    ]]
    fillet(fillet4_edges, radius=FILLET4_R)

    # Sketch33 → Boss-Extrude6 (add)
    with BuildSketch(Plane.XZ.offset(BOSS_EXTRUDE6_START)):
        with BuildLine():
            Line((105, -30), (135, -30))
            Line((135, -30), (135, 10))
            Line((135, 10), (105, 10))
            ThreePointArc((105, 10), (108.535533906, 8.535533906), (110, 5))
            Line((110, 5), (110, -25))
            ThreePointArc((110, -25), (108.535533906, -28.535533906), (105, -30))
        make_face()
    extrude(amount=BOSS_EXTRUDE6_DEPTH)

    # Sketch36 → CBORE for M5 SHCS2 (revolve, cut)
    with BuildSketch(Plane(origin=(120, 0, -10.002889337), x_dir=(0, 0, -1), z_dir=(1, 0, 0))):
        Polygon((0, 0), (0, 10), (2.75, 10), (2.75, 5), (5, 5), (5, 0.020977491), (5.025, 0), align=None)
    revolve(axis=Axis((120, -6.35, -10.002889337), (0, 1, 0)), mode=Mode.SUBTRACT)

    # Fillet5
    fillet5_edges = [part.edges().sort_by_distance(p)[0] for p in [
        (135, 5, -30),
        (135, 5, 10),
    ]]
    fillet(fillet5_edges, radius=FILLET5_R)

    # Sketch38 → Boss-Extrude7 (add)
    with BuildSketch(Plane.XZ):
        with Locations((71, -21.75)):
            Rectangle(SKETCH38_W, SKETCH38_H)
        with Locations((104.25, -27)):
            Rectangle(SKETCH38_W_2, SKETCH38_H_2)
    extrude(amount=BOSS_EXTRUDE7_DEPTH)

    # Fillet6
    # the kernel refuses this fillet: 1 mm, written as the material it takes off along each edge
    with BuildSketch(Plane(origin=(68, 0, -13.5), x_dir=(0, 0, -1), z_dir=(0, -1, 0)), Plane(origin=(68, 0, -30), x_dir=(1, 0, 0), z_dir=(0, -1, 0)), Plane(origin=(74, 0, -13.5), x_dir=(-1, 0, 0), z_dir=(0, -1, 0)), Plane(origin=(96, 0, -24), x_dir=(0, 0, -1), z_dir=(0, -1, 0)), Plane(origin=(96, 0, -30), x_dir=(1, 0, 0), z_dir=(0, -1, 0)), Plane(origin=(112.5, 0, -24), x_dir=(-1, 0, 0), z_dir=(0, -1, 0))) as fillet6_piece_1:
        with BuildLine():
            CenterArc((FILLET6_R, FILLET6_R), FILLET6_R, 180, 90)
            Line((0, FILLET6_R), (0, 0))
            Line((0, 0), (FILLET6_R, 0))
        make_face()
    extrude(amount=23.5, mode=Mode.SUBTRACT)
    with BuildSketch(Plane(origin=(74, 0, -30), x_dir=(-1, 0, 0), z_dir=(0, -1, 0)), Plane(origin=(112.5, 0, -30), x_dir=(-1, 0, 0), z_dir=(0, -1, 0))) as fillet6_piece_2:
        with BuildLine():
            CenterArc((FILLET6_R, -FILLET6_R), FILLET6_R, 90, 90)
            Line((0, -FILLET6_R), (0, 0))
            Line((0, 0), (FILLET6_R, 0))
        make_face()
    extrude(amount=23.5, mode=Mode.SUBTRACT)

    # Sketch39 → Cut-Extrude10 (cut)
    with BuildSketch(Plane.ZY.offset(-68)):
        with Locations((-19.79, -6.5)):
            Circle(SKETCH39_R)
        with Locations((-19.79, -16)):
            Circle(SKETCH39_R)
    extrude(amount=-CUT_EXTRUDE10_DEPTH, mode=Mode.SUBTRACT)

    # Sketch42 → Cut-Extrude11 (cut)
    with BuildSketch(Plane.XZ.offset(21).offset(CUT_EXTRUDE11_START)):
        with BuildLine():
            Line((96, -25), (96, -29))
            ThreePointArc((96, -29), (96.292893219, -29.707106781), (97, -30))
            Line((97, -30), (111.5, -30))
            ThreePointArc((111.5, -30), (112.207106781, -29.707106781), (112.5, -29))
            Line((112.5, -29), (112.5, -25))
            ThreePointArc((112.5, -25), (112.207106781, -24.292893219), (111.5, -24))
            Line((111.5, -24), (97, -24))
            ThreePointArc((97, -24), (96.292893219, -24.292893219), (96, -25))
        make_face()
    extrude(amount=CUT_EXTRUDE11_DEPTH, mode=Mode.SUBTRACT)

    # Sketch43 → Cut-Extrude12 (cut)
    with BuildSketch(Plane(origin=(0, 0, -30), x_dir=(-1, 0, 0), z_dir=(0, 0, -1))):
        with Locations((-98.9, 8)):
            Circle(SKETCH43_R)
        with Locations((-98.9, -1.5)):
            Circle(SKETCH43_R)
    extrude(amount=-CUT_EXTRUDE12_DEPTH, mode=Mode.SUBTRACT)

    # Sketch44 → Cut-Extrude13 (cut, through all)
    with BuildSketch(Plane(origin=(0, 10, 0), x_dir=(1, 0, 0), z_dir=(0, 1, 0))):
        with BuildLine():
            Line((130, -10), (97, -10))
            Line((97, -10), (97, -3))
            Line((97, -3), (135, -3))
            Line((135, -3), (135, -5))
            ThreePointArc((135, -5), (133.535533906, -8.535533906), (130, -10))
        make_face()
    extrude(amount=-CUT_EXTRUDE13_DEPTH, mode=Mode.SUBTRACT)

    # Fillet7
    fillet7_edges = [part.edges().sort_by_distance(p)[0] for p in [
        (97, 5, 10),
        (97, 5, 3),
        (135, 5, 3),
    ]]
    fillet(fillet7_edges, radius=FILLET7_R)


solid = part.part
